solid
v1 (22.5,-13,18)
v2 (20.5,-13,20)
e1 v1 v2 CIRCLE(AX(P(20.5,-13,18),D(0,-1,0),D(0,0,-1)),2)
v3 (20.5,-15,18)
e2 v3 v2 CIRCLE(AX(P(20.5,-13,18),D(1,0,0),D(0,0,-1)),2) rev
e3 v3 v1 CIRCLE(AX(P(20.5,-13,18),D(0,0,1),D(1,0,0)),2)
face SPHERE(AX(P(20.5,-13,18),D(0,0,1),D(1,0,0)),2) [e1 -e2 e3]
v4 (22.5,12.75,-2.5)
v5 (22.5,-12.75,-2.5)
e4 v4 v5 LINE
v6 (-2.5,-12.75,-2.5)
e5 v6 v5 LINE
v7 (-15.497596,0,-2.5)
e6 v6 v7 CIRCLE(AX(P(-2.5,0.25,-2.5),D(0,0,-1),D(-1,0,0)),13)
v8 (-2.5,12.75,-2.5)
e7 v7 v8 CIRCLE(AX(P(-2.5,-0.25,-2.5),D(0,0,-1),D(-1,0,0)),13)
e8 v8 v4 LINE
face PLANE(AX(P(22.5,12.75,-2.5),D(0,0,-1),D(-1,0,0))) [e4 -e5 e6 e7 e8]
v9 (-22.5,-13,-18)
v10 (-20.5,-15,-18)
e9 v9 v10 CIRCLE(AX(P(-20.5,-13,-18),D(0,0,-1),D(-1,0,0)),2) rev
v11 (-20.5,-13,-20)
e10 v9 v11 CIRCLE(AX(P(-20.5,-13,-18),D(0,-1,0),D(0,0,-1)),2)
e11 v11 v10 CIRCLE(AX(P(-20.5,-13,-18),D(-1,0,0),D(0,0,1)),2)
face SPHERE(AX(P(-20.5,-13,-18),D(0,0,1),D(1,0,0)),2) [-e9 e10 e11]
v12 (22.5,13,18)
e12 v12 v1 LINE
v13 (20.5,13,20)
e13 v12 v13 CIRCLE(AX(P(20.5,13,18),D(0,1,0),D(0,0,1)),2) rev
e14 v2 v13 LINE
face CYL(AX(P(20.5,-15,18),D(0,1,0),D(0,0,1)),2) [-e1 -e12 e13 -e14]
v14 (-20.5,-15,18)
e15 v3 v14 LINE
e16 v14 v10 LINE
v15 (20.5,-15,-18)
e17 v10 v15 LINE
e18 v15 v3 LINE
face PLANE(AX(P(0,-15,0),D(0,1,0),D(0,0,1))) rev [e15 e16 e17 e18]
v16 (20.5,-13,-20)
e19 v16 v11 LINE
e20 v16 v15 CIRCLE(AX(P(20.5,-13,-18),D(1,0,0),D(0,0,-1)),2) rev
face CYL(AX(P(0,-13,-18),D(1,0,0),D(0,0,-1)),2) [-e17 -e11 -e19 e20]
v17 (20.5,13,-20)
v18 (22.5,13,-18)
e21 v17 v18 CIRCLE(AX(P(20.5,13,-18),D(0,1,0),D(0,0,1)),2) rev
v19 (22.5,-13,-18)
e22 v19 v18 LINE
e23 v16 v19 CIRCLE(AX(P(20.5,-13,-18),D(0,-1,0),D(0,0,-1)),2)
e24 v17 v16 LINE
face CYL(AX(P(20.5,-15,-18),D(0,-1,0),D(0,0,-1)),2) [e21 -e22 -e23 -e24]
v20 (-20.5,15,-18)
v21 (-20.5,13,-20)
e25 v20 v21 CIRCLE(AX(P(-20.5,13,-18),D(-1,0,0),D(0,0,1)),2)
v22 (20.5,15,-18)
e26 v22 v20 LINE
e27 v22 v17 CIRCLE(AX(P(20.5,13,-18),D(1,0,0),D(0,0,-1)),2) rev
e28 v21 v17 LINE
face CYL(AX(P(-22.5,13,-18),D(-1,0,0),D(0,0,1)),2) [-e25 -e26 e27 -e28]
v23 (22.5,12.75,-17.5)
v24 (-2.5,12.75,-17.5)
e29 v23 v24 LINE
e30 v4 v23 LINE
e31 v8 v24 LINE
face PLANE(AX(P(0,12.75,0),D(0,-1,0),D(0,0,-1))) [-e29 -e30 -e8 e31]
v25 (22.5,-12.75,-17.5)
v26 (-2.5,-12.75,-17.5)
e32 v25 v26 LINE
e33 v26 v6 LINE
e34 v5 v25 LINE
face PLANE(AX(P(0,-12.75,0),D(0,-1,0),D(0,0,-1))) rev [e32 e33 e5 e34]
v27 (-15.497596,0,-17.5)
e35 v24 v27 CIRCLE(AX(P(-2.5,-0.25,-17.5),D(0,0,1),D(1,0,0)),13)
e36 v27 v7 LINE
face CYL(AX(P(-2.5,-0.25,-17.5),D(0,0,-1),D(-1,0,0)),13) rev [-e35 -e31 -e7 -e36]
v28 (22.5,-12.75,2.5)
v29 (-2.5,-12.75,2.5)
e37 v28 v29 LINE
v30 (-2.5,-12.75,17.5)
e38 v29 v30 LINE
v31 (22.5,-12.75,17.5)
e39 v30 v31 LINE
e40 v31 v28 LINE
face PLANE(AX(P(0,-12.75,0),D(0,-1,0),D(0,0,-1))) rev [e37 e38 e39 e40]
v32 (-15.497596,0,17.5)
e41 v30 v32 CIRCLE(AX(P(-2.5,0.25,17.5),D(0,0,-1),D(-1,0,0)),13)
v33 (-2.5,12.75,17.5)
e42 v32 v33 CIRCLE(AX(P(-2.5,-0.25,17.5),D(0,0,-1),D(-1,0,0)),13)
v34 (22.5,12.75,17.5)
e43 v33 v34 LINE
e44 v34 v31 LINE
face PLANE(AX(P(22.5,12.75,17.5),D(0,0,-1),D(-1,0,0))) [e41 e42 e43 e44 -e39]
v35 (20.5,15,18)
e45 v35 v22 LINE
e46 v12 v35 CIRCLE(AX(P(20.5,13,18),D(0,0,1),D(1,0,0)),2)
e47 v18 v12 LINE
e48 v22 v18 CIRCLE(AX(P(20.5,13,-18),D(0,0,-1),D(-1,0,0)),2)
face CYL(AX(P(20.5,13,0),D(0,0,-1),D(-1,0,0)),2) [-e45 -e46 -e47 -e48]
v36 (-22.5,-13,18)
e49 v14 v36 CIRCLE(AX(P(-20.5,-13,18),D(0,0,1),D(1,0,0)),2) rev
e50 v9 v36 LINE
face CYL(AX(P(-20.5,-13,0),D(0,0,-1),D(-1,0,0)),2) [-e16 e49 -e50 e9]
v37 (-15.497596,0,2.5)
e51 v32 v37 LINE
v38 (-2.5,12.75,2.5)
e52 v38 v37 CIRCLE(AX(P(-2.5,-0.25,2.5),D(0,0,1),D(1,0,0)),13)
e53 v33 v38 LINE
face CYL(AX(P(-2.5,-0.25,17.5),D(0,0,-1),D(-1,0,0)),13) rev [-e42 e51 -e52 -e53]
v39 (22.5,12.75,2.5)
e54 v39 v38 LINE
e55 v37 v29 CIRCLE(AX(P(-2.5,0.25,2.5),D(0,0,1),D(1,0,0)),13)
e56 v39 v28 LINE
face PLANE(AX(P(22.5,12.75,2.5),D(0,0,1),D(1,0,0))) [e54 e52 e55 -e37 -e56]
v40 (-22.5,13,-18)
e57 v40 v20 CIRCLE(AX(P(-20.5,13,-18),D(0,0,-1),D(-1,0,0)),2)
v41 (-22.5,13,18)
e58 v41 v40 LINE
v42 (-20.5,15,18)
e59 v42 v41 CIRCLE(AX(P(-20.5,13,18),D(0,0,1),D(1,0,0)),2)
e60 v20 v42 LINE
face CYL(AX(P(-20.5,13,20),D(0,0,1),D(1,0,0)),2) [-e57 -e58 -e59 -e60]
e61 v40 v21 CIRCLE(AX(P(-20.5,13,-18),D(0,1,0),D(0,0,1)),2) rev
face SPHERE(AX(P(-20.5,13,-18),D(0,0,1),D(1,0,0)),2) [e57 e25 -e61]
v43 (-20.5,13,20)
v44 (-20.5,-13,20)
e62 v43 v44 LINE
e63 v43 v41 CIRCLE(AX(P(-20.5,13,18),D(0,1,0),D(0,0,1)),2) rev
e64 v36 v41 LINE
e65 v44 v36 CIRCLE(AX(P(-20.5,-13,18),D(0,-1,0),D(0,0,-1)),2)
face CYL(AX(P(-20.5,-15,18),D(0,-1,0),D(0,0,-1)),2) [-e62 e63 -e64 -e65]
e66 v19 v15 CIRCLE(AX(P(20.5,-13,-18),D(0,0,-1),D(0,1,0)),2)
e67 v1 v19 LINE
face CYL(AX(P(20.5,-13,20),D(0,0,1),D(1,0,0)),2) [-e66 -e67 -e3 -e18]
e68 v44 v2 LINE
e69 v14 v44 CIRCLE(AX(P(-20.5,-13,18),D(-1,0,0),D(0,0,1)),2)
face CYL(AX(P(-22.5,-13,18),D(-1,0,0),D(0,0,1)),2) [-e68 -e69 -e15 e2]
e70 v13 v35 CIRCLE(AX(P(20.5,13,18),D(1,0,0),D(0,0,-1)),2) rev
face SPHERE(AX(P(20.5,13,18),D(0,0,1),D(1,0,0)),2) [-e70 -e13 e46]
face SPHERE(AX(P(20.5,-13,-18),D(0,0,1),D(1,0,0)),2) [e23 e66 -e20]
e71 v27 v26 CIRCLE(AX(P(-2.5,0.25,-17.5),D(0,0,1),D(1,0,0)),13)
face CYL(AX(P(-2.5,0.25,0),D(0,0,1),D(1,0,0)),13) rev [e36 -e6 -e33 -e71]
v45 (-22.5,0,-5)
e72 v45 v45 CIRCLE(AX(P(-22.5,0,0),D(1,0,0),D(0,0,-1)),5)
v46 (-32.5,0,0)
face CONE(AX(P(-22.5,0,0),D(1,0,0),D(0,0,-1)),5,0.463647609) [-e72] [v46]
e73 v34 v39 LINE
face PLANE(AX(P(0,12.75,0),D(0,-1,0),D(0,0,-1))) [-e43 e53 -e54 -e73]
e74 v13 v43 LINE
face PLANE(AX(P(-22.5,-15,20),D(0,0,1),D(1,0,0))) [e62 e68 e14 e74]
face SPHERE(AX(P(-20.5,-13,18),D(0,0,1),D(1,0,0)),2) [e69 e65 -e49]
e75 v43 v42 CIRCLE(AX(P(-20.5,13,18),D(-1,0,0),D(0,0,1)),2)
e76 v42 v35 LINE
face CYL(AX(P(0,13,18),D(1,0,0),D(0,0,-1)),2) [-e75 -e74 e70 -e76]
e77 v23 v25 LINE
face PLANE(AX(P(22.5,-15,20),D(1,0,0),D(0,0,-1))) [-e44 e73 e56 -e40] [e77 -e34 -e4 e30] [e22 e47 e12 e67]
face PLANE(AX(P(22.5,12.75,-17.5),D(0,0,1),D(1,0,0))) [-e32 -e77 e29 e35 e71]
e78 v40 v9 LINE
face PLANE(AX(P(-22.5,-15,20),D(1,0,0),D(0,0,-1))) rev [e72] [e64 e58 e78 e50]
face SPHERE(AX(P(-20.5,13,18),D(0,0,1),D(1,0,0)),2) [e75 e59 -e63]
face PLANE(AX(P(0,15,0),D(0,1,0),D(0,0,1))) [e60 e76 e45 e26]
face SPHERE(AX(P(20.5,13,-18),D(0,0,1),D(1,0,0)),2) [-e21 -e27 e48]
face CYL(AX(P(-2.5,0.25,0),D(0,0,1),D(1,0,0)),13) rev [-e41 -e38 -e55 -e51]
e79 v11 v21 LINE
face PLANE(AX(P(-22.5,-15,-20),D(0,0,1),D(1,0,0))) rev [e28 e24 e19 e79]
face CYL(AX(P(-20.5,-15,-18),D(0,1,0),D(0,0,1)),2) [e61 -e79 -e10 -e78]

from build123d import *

# Parameters (mm, degrees)
BOSS_EXTRUDE1_DEPTH      = 15
BOSS_EXTRUDE1_DEPTH_BACK = 15
SKETCH1_W                = 45
SKETCH1_H                = 40
CUT_EXTRUDE1_DEPTH       = 12.75
CUT_EXTRUDE1_DEPTH_BACK  = 12.75
SKETCH2_W                = 38
SKETCH2_H                = 15
FILLET1_R                = 13
FILLET2_R                = 2


with BuildPart() as part:
    # Sketch1 → Boss-Extrude1 (new, two sides: drawn at the far end of the back side and taken through both)
    with BuildSketch(Plane(origin=(0, 0, 0), x_dir=(1, 0, 0), z_dir=(0, 1, 0)).offset(-BOSS_EXTRUDE1_DEPTH_BACK)):
        Rectangle(SKETCH1_W, SKETCH1_H)
    extrude(amount=BOSS_EXTRUDE1_DEPTH + BOSS_EXTRUDE1_DEPTH_BACK)

    # Sketch2 → Cut-Extrude1 (cut, two sides: drawn at the far end of the back side and taken through both)
    with BuildSketch(Plane(origin=(0, 0, 0), x_dir=(1, 0, 0), z_dir=(0, 1, 0)).offset(-CUT_EXTRUDE1_DEPTH_BACK)):
        with Locations((3.5, 10)):
            Rectangle(SKETCH2_W, SKETCH2_H)
        with Locations((3.5, -10)):
            Rectangle(SKETCH2_W, SKETCH2_H)
    extrude(amount=CUT_EXTRUDE1_DEPTH + CUT_EXTRUDE1_DEPTH_BACK, mode=Mode.SUBTRACT)

    # Fillet1
    # the kernel refuses this fillet: 13 mm, written as the material it adds along each edge
    with BuildSketch(Plane(origin=(-15.5, -12.75, -17.5), x_dir=(1, 0, 0), z_dir=(0, 0, 1))) as fillet1_piece_1_section:
        with BuildLine():
            CenterArc((FILLET1_R, FILLET1_R), FILLET1_R, 180, 90)
            Line((0, FILLET1_R), (0, 0))
            Line((0, 0), (FILLET1_R, 0))
        make_face()
    fillet1_piece_1 = extrude(amount=47.5, mode=Mode.PRIVATE)
    fillet1_piece_1 = split(fillet1_piece_1, bisect_by=Plane(origin=(-12.596216794, -9.846216794, 17.5), z_dir=(0, 0, -1)), keep=Keep.TOP, mode=Mode.PRIVATE)
    add(fillet1_piece_1)
    with BuildSketch(Plane(origin=(-15.5, 12.75, -17.5), x_dir=(1, 0, 0), z_dir=(0, 0, 1))) as fillet1_piece_2_section:
        with BuildLine():
            CenterArc((FILLET1_R, -FILLET1_R), FILLET1_R, 90, 90)
            Line((0, -FILLET1_R), (0, 0))
            Line((0, 0), (FILLET1_R, 0))
        make_face()
    fillet1_piece_2 = extrude(amount=47.5, mode=Mode.PRIVATE)
    fillet1_piece_2 = split(fillet1_piece_2, bisect_by=Plane(origin=(-12.596216794, 9.846216794, 17.5), z_dir=(0, 0, -1)), keep=Keep.TOP, mode=Mode.PRIVATE)
    add(fillet1_piece_2)
    with BuildSketch(Plane(origin=(-15.5, 12.75, 17.5), x_dir=(1, 0, 0), z_dir=(0, 0, -1))) as fillet1_piece_3_section:
        with BuildLine():
            CenterArc((FILLET1_R, FILLET1_R), FILLET1_R, 180, 90)
            Line((0, FILLET1_R), (0, 0))
            Line((0, 0), (FILLET1_R, 0))
        make_face()
    fillet1_piece_3 = extrude(amount=47.5, mode=Mode.PRIVATE)
    fillet1_piece_3 = split(fillet1_piece_3, bisect_by=Plane(origin=(-12.596216794, 9.846216794, -17.5), z_dir=(0, 0, 1)), keep=Keep.TOP, mode=Mode.PRIVATE)
    add(fillet1_piece_3)
    with BuildSketch(Plane(origin=(-15.5, -12.75, 17.5), x_dir=(1, 0, 0), z_dir=(0, 0, -1))) as fillet1_piece_4_section:
        with BuildLine():
            CenterArc((FILLET1_R, -FILLET1_R), FILLET1_R, 90, 90)
            Line((0, -FILLET1_R), (0, 0))
            Line((0, 0), (FILLET1_R, 0))
        make_face()
    fillet1_piece_4 = extrude(amount=47.5, mode=Mode.PRIVATE)
    fillet1_piece_4 = split(fillet1_piece_4, bisect_by=Plane(origin=(-12.596216794, -9.846216794, -17.5), z_dir=(0, 0, 1)), keep=Keep.TOP, mode=Mode.PRIVATE)
    add(fillet1_piece_4)

    # Fillet2
    fillet2_edges = [part.edges().sort_by_distance(p)[0] for p in [
        (0, 15, -20),
        (-22.5, 15, 0),
        (0, 15, 20),
        (0, -15, -20),
        (22.5, 15, 0),
        (-22.5, -15, 0),
        (0, -15, 20),
        (-22.5, 0, 20),
        (-22.5, 0, -20),
        (22.5, 0, -20),
        (22.5, 0, 20),
        (22.5, -15, 0),
    ]]
    fillet(fillet2_edges, radius=FILLET2_R)

    # Sketch3 → Revolve1 (revolve)
    with BuildSketch(Plane(origin=(0, 0, 0), x_dir=(1, 0, 0), z_dir=(0, 1, 0))):
        Polygon((-22.5, 0), (-32.5, 0), (-22.5, 5), align=None)
    revolve(axis=Axis((-22.5, 0, 0), (-1, 0, 0)))


solid = part.part
